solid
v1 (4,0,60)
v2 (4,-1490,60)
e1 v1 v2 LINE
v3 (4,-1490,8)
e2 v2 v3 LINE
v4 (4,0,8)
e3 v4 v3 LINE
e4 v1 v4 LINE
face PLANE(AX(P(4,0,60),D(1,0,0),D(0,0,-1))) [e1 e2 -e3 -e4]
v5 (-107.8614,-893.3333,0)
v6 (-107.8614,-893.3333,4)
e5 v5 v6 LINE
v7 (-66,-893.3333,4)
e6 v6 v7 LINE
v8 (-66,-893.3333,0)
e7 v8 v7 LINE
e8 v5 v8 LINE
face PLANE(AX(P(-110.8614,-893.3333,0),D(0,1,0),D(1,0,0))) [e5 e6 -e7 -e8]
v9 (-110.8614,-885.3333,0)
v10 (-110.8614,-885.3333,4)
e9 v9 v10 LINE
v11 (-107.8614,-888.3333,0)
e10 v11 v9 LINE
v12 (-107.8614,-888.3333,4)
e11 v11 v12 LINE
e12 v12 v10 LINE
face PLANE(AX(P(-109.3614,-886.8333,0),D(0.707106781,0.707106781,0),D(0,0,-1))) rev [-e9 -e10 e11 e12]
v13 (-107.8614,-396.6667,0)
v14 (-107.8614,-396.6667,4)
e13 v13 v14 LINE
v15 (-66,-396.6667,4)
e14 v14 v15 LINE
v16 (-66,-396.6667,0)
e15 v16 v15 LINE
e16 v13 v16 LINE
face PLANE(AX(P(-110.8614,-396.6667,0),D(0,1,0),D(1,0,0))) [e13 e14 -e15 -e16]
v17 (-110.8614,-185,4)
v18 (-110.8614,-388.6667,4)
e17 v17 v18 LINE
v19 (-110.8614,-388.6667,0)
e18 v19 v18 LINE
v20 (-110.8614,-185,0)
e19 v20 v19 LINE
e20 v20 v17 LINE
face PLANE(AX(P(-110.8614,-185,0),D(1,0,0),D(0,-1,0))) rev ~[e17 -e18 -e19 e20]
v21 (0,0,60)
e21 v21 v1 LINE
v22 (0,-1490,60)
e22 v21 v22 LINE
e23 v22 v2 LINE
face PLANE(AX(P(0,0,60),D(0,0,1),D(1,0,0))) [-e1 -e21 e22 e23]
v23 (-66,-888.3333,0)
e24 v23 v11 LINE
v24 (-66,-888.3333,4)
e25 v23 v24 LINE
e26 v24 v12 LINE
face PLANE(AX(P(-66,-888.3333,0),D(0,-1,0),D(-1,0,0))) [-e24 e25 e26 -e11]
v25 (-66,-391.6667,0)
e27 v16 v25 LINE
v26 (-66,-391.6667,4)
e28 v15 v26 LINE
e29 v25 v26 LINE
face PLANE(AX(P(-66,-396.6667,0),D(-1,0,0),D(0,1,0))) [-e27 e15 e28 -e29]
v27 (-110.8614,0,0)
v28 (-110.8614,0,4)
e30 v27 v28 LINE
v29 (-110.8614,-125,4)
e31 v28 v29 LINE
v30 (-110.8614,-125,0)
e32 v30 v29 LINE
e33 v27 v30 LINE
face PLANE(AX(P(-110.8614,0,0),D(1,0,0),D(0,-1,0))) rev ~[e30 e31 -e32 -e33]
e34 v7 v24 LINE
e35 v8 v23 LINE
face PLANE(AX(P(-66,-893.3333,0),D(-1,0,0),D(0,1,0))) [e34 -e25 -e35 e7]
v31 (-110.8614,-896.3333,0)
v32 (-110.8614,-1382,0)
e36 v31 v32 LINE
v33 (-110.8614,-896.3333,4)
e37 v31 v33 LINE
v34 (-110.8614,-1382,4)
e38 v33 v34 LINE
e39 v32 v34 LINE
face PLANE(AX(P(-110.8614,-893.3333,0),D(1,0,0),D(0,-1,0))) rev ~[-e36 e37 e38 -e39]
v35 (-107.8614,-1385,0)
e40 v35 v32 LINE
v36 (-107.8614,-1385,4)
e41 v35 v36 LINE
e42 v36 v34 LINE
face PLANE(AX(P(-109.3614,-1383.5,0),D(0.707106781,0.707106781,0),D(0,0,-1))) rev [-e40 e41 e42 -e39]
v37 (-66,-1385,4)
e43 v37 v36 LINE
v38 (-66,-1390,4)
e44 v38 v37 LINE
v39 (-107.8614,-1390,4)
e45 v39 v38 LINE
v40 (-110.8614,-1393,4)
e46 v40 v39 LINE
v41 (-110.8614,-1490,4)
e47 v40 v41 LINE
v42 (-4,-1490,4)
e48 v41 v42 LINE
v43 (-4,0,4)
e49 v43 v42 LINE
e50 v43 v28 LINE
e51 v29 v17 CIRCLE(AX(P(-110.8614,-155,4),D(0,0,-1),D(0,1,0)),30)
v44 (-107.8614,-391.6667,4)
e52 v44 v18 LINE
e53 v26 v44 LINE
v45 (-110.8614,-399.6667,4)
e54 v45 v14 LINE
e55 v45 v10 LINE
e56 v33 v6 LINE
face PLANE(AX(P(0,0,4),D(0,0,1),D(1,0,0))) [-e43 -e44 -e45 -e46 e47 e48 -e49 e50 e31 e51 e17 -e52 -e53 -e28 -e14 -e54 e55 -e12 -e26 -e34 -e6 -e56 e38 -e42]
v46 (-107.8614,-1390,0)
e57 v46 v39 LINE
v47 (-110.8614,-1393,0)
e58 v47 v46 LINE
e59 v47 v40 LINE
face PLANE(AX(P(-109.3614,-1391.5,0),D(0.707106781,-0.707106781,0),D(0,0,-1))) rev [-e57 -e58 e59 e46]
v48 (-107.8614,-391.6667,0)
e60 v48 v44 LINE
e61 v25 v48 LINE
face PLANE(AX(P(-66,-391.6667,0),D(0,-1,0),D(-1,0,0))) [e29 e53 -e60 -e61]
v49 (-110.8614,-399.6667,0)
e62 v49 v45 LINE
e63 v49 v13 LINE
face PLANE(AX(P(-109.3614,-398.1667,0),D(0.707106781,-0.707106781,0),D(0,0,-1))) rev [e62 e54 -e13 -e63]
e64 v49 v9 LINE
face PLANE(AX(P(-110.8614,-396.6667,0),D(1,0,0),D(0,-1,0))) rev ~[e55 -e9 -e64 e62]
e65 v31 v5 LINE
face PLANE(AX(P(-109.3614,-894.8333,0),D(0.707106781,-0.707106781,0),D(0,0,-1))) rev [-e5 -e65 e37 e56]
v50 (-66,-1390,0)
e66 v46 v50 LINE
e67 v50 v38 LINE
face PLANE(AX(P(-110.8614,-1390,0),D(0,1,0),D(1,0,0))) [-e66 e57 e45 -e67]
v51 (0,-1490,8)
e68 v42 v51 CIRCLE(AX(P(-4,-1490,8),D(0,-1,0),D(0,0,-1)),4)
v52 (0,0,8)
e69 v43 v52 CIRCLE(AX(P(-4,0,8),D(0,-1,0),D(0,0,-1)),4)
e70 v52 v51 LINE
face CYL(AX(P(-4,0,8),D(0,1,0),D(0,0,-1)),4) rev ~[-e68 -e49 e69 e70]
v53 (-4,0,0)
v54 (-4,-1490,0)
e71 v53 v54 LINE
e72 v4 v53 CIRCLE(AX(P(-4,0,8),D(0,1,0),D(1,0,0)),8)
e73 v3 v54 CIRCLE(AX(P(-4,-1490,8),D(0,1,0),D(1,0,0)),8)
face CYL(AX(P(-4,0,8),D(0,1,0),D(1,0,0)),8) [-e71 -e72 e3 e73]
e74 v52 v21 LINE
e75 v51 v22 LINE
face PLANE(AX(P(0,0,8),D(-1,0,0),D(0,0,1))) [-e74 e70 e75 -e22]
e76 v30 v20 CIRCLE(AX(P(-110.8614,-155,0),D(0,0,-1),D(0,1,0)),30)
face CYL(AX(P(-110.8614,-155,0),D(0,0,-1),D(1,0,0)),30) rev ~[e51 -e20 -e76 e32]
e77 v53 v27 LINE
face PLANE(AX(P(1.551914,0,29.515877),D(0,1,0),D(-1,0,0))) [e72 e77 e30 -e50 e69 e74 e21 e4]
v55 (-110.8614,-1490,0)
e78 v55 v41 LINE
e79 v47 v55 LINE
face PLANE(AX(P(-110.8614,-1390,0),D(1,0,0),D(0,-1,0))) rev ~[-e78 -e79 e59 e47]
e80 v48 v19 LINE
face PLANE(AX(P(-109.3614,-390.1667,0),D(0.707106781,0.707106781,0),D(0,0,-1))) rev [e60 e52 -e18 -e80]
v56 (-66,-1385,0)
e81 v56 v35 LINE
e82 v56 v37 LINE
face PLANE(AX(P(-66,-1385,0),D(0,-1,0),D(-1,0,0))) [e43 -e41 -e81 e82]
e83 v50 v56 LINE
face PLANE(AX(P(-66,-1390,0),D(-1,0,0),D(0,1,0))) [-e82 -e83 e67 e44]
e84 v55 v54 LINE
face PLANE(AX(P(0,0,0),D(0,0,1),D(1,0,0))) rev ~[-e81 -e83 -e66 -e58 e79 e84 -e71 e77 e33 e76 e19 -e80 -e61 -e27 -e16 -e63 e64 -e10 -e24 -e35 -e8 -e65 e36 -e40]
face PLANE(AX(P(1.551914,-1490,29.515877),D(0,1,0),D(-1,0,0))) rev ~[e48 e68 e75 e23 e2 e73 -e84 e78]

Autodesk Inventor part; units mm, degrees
ref_plane "YZ Plane" through (0, 0, 0) normal (1, 0, 0) x (0, 1, 0)
ref_plane "XZ Plane" through (0, 0, 0) normal (0, 1, 0) x (-1, 0, 0)
ref_plane "XY Plane" through (0, 0, 0) normal (0, 0, 1) x (1, 0, 0)
sketch "Sketch1" plane through (0, 0, 0) normal (0, 0, 1) x (1, 0, 0)
  line L0 (0, 0) -> (-110.8614, 0)
  line L1 (-110.8614, 0) -> (-110.8614, -1490)
  line L2 (-110.8614, -1490) -> (0, -1490)
  line L3 (0, -1490) -> (0, 0)
  line L4 (-110.8614, -1390) -> (-66, -1390)
  line L5 (-66, -1390) -> (-66, -1385)
  line L6 (-66, -1385) -> (-110.8614, -1385)
  line L7 (-110.8614, -1385) -> (-110.8614, -1390)
  line L8 (-110.8614, -893.3333) -> (-66, -893.3333)
  line L9 (-66, -893.3333) -> (-66, -888.3333)
  line L10 (-66, -888.3333) -> (-110.8614, -888.3333)
  line L11 (-110.8614, -888.3333) -> (-110.8614, -893.3333)
  line L12 (-110.8614, -396.6667) -> (-66, -396.6667)
  line L13 (-66, -396.6667) -> (-66, -391.6667)
  line L14 (-66, -391.6667) -> (-110.8614, -391.6667)
  line L15 (-110.8614, -391.6667) -> (-110.8614, -396.6667)
  circle A0 centre (-110.8614, -155) radius 30
  point P0 (-110.8614, -1385)
  point P1 (-110.8614, -125)
  point P2 (-110.8614, -185)
  dimension "d0" = 1490
  dimension "d1" = 110.8614
  dimension "d2" = 5
  dimension "d4" = 100
  dimension "d7" = 496.6667
  dimension "d23" = 66
  dimension "d28" = 60
  dimension "d29" = 1335
extrude "Plate1" add sketch "Sketch1" along normal blind 4 contours L3 L2 L1 L4 L5 L6 L8 L9 L10 L12 L13 L14 A0 L0
sketch "Sketch2" plane through (4, 0, 0) normal (-1, 0, 0) x (0, -1, 0)
  line L0 (1490, 0) -> (0, 0)
  line L1 (0, 0) -> (0, 60)
  line L2 (0, 60) -> (1490, 60)
  line L3 (1490, 60) -> (1490, 0)
edge flange "Flange1" height 60 angle 90 thickness 4 bend radius 4 thickness toward (-1, 0, 0) relief tear relief width 4 relief depth 2 edges at (0, -745, 4) wall of the first edge with corners at (4, -1490, 0) (4, 0, 0) (4, 0, 60) (4, -1490, 60)
bend "Bend1"
corner "Corner1"
chamfer "Corner Chamfer1" distance 3 angle 45 6 edges at (-110.8614, -1390, 2) (-110.8614, -1385, 2) (-110.8614, -893.3333, 2) (-110.8614, -888.3333, 2) (-110.8614, -391.6667, 2) (-110.8614, -396.6667, 2)
equation "\"d0\" = Стрингер_длина"
equation "\"d1\" = стрингер_глубина_8"
equation "\"d2\" = паз_под_стрингер_толщина"
equation "\"d7\" = 0.333333 * Стрингер_длина"
equation "\"d23\" = паз_под_стрингер_глубина - Thickness"
equation "\"d28\" = 2 * радиус_выреза_под_сварку"
equation "\"d12\" = Thickness"
equation "\"d13\" = BendReliefWidth"
equation "\"d14\" = BendReliefDepth"
equation "\"d15\" = MinimumRemnant"
equation "\"d16\" = TransitionRadius"
equation "\"d17\" = ребро_усилителей"
equation "\"d19\" = BendRadius"
equation "\"d20\" = CornerReliefSize"
equation "\"d21\" = GapSize"
equation "\"d22\" = JacobiRadiusSize"
equation "\"BendRadius\" = Thickness"
equation "\"BendReliefWidth\" = Thickness"
equation "\"BendReliefDepth\" = 0.5 * Thickness"
equation "\"CornerReliefSize\" = 4 * Thickness"
equation "\"MinimumRemnant\" = 2 * Thickness"
equation "\"TransitionRadius\" = BendRadius"
equation "\"JacobiRadiusSize\" = BendRadius"
equation "\"GapSize\" = Thickness"
equation "\"Стрингер_длина\" = 1490"
equation "\"стрингер_глубина_8\" = 110.861434"
equation "\"паз_под_стрингер_толщина\" = 5"
equation "\"паз_под_стрингер_глубина\" = 70"
equation "\"Thickness\" = 4"
equation "\"радиус_выреза_под_сварку\" = 30"
equation "\"ребро_усилителей\" = 60"
properties part number "GBK 1313 stringer 8" material "Steel"
